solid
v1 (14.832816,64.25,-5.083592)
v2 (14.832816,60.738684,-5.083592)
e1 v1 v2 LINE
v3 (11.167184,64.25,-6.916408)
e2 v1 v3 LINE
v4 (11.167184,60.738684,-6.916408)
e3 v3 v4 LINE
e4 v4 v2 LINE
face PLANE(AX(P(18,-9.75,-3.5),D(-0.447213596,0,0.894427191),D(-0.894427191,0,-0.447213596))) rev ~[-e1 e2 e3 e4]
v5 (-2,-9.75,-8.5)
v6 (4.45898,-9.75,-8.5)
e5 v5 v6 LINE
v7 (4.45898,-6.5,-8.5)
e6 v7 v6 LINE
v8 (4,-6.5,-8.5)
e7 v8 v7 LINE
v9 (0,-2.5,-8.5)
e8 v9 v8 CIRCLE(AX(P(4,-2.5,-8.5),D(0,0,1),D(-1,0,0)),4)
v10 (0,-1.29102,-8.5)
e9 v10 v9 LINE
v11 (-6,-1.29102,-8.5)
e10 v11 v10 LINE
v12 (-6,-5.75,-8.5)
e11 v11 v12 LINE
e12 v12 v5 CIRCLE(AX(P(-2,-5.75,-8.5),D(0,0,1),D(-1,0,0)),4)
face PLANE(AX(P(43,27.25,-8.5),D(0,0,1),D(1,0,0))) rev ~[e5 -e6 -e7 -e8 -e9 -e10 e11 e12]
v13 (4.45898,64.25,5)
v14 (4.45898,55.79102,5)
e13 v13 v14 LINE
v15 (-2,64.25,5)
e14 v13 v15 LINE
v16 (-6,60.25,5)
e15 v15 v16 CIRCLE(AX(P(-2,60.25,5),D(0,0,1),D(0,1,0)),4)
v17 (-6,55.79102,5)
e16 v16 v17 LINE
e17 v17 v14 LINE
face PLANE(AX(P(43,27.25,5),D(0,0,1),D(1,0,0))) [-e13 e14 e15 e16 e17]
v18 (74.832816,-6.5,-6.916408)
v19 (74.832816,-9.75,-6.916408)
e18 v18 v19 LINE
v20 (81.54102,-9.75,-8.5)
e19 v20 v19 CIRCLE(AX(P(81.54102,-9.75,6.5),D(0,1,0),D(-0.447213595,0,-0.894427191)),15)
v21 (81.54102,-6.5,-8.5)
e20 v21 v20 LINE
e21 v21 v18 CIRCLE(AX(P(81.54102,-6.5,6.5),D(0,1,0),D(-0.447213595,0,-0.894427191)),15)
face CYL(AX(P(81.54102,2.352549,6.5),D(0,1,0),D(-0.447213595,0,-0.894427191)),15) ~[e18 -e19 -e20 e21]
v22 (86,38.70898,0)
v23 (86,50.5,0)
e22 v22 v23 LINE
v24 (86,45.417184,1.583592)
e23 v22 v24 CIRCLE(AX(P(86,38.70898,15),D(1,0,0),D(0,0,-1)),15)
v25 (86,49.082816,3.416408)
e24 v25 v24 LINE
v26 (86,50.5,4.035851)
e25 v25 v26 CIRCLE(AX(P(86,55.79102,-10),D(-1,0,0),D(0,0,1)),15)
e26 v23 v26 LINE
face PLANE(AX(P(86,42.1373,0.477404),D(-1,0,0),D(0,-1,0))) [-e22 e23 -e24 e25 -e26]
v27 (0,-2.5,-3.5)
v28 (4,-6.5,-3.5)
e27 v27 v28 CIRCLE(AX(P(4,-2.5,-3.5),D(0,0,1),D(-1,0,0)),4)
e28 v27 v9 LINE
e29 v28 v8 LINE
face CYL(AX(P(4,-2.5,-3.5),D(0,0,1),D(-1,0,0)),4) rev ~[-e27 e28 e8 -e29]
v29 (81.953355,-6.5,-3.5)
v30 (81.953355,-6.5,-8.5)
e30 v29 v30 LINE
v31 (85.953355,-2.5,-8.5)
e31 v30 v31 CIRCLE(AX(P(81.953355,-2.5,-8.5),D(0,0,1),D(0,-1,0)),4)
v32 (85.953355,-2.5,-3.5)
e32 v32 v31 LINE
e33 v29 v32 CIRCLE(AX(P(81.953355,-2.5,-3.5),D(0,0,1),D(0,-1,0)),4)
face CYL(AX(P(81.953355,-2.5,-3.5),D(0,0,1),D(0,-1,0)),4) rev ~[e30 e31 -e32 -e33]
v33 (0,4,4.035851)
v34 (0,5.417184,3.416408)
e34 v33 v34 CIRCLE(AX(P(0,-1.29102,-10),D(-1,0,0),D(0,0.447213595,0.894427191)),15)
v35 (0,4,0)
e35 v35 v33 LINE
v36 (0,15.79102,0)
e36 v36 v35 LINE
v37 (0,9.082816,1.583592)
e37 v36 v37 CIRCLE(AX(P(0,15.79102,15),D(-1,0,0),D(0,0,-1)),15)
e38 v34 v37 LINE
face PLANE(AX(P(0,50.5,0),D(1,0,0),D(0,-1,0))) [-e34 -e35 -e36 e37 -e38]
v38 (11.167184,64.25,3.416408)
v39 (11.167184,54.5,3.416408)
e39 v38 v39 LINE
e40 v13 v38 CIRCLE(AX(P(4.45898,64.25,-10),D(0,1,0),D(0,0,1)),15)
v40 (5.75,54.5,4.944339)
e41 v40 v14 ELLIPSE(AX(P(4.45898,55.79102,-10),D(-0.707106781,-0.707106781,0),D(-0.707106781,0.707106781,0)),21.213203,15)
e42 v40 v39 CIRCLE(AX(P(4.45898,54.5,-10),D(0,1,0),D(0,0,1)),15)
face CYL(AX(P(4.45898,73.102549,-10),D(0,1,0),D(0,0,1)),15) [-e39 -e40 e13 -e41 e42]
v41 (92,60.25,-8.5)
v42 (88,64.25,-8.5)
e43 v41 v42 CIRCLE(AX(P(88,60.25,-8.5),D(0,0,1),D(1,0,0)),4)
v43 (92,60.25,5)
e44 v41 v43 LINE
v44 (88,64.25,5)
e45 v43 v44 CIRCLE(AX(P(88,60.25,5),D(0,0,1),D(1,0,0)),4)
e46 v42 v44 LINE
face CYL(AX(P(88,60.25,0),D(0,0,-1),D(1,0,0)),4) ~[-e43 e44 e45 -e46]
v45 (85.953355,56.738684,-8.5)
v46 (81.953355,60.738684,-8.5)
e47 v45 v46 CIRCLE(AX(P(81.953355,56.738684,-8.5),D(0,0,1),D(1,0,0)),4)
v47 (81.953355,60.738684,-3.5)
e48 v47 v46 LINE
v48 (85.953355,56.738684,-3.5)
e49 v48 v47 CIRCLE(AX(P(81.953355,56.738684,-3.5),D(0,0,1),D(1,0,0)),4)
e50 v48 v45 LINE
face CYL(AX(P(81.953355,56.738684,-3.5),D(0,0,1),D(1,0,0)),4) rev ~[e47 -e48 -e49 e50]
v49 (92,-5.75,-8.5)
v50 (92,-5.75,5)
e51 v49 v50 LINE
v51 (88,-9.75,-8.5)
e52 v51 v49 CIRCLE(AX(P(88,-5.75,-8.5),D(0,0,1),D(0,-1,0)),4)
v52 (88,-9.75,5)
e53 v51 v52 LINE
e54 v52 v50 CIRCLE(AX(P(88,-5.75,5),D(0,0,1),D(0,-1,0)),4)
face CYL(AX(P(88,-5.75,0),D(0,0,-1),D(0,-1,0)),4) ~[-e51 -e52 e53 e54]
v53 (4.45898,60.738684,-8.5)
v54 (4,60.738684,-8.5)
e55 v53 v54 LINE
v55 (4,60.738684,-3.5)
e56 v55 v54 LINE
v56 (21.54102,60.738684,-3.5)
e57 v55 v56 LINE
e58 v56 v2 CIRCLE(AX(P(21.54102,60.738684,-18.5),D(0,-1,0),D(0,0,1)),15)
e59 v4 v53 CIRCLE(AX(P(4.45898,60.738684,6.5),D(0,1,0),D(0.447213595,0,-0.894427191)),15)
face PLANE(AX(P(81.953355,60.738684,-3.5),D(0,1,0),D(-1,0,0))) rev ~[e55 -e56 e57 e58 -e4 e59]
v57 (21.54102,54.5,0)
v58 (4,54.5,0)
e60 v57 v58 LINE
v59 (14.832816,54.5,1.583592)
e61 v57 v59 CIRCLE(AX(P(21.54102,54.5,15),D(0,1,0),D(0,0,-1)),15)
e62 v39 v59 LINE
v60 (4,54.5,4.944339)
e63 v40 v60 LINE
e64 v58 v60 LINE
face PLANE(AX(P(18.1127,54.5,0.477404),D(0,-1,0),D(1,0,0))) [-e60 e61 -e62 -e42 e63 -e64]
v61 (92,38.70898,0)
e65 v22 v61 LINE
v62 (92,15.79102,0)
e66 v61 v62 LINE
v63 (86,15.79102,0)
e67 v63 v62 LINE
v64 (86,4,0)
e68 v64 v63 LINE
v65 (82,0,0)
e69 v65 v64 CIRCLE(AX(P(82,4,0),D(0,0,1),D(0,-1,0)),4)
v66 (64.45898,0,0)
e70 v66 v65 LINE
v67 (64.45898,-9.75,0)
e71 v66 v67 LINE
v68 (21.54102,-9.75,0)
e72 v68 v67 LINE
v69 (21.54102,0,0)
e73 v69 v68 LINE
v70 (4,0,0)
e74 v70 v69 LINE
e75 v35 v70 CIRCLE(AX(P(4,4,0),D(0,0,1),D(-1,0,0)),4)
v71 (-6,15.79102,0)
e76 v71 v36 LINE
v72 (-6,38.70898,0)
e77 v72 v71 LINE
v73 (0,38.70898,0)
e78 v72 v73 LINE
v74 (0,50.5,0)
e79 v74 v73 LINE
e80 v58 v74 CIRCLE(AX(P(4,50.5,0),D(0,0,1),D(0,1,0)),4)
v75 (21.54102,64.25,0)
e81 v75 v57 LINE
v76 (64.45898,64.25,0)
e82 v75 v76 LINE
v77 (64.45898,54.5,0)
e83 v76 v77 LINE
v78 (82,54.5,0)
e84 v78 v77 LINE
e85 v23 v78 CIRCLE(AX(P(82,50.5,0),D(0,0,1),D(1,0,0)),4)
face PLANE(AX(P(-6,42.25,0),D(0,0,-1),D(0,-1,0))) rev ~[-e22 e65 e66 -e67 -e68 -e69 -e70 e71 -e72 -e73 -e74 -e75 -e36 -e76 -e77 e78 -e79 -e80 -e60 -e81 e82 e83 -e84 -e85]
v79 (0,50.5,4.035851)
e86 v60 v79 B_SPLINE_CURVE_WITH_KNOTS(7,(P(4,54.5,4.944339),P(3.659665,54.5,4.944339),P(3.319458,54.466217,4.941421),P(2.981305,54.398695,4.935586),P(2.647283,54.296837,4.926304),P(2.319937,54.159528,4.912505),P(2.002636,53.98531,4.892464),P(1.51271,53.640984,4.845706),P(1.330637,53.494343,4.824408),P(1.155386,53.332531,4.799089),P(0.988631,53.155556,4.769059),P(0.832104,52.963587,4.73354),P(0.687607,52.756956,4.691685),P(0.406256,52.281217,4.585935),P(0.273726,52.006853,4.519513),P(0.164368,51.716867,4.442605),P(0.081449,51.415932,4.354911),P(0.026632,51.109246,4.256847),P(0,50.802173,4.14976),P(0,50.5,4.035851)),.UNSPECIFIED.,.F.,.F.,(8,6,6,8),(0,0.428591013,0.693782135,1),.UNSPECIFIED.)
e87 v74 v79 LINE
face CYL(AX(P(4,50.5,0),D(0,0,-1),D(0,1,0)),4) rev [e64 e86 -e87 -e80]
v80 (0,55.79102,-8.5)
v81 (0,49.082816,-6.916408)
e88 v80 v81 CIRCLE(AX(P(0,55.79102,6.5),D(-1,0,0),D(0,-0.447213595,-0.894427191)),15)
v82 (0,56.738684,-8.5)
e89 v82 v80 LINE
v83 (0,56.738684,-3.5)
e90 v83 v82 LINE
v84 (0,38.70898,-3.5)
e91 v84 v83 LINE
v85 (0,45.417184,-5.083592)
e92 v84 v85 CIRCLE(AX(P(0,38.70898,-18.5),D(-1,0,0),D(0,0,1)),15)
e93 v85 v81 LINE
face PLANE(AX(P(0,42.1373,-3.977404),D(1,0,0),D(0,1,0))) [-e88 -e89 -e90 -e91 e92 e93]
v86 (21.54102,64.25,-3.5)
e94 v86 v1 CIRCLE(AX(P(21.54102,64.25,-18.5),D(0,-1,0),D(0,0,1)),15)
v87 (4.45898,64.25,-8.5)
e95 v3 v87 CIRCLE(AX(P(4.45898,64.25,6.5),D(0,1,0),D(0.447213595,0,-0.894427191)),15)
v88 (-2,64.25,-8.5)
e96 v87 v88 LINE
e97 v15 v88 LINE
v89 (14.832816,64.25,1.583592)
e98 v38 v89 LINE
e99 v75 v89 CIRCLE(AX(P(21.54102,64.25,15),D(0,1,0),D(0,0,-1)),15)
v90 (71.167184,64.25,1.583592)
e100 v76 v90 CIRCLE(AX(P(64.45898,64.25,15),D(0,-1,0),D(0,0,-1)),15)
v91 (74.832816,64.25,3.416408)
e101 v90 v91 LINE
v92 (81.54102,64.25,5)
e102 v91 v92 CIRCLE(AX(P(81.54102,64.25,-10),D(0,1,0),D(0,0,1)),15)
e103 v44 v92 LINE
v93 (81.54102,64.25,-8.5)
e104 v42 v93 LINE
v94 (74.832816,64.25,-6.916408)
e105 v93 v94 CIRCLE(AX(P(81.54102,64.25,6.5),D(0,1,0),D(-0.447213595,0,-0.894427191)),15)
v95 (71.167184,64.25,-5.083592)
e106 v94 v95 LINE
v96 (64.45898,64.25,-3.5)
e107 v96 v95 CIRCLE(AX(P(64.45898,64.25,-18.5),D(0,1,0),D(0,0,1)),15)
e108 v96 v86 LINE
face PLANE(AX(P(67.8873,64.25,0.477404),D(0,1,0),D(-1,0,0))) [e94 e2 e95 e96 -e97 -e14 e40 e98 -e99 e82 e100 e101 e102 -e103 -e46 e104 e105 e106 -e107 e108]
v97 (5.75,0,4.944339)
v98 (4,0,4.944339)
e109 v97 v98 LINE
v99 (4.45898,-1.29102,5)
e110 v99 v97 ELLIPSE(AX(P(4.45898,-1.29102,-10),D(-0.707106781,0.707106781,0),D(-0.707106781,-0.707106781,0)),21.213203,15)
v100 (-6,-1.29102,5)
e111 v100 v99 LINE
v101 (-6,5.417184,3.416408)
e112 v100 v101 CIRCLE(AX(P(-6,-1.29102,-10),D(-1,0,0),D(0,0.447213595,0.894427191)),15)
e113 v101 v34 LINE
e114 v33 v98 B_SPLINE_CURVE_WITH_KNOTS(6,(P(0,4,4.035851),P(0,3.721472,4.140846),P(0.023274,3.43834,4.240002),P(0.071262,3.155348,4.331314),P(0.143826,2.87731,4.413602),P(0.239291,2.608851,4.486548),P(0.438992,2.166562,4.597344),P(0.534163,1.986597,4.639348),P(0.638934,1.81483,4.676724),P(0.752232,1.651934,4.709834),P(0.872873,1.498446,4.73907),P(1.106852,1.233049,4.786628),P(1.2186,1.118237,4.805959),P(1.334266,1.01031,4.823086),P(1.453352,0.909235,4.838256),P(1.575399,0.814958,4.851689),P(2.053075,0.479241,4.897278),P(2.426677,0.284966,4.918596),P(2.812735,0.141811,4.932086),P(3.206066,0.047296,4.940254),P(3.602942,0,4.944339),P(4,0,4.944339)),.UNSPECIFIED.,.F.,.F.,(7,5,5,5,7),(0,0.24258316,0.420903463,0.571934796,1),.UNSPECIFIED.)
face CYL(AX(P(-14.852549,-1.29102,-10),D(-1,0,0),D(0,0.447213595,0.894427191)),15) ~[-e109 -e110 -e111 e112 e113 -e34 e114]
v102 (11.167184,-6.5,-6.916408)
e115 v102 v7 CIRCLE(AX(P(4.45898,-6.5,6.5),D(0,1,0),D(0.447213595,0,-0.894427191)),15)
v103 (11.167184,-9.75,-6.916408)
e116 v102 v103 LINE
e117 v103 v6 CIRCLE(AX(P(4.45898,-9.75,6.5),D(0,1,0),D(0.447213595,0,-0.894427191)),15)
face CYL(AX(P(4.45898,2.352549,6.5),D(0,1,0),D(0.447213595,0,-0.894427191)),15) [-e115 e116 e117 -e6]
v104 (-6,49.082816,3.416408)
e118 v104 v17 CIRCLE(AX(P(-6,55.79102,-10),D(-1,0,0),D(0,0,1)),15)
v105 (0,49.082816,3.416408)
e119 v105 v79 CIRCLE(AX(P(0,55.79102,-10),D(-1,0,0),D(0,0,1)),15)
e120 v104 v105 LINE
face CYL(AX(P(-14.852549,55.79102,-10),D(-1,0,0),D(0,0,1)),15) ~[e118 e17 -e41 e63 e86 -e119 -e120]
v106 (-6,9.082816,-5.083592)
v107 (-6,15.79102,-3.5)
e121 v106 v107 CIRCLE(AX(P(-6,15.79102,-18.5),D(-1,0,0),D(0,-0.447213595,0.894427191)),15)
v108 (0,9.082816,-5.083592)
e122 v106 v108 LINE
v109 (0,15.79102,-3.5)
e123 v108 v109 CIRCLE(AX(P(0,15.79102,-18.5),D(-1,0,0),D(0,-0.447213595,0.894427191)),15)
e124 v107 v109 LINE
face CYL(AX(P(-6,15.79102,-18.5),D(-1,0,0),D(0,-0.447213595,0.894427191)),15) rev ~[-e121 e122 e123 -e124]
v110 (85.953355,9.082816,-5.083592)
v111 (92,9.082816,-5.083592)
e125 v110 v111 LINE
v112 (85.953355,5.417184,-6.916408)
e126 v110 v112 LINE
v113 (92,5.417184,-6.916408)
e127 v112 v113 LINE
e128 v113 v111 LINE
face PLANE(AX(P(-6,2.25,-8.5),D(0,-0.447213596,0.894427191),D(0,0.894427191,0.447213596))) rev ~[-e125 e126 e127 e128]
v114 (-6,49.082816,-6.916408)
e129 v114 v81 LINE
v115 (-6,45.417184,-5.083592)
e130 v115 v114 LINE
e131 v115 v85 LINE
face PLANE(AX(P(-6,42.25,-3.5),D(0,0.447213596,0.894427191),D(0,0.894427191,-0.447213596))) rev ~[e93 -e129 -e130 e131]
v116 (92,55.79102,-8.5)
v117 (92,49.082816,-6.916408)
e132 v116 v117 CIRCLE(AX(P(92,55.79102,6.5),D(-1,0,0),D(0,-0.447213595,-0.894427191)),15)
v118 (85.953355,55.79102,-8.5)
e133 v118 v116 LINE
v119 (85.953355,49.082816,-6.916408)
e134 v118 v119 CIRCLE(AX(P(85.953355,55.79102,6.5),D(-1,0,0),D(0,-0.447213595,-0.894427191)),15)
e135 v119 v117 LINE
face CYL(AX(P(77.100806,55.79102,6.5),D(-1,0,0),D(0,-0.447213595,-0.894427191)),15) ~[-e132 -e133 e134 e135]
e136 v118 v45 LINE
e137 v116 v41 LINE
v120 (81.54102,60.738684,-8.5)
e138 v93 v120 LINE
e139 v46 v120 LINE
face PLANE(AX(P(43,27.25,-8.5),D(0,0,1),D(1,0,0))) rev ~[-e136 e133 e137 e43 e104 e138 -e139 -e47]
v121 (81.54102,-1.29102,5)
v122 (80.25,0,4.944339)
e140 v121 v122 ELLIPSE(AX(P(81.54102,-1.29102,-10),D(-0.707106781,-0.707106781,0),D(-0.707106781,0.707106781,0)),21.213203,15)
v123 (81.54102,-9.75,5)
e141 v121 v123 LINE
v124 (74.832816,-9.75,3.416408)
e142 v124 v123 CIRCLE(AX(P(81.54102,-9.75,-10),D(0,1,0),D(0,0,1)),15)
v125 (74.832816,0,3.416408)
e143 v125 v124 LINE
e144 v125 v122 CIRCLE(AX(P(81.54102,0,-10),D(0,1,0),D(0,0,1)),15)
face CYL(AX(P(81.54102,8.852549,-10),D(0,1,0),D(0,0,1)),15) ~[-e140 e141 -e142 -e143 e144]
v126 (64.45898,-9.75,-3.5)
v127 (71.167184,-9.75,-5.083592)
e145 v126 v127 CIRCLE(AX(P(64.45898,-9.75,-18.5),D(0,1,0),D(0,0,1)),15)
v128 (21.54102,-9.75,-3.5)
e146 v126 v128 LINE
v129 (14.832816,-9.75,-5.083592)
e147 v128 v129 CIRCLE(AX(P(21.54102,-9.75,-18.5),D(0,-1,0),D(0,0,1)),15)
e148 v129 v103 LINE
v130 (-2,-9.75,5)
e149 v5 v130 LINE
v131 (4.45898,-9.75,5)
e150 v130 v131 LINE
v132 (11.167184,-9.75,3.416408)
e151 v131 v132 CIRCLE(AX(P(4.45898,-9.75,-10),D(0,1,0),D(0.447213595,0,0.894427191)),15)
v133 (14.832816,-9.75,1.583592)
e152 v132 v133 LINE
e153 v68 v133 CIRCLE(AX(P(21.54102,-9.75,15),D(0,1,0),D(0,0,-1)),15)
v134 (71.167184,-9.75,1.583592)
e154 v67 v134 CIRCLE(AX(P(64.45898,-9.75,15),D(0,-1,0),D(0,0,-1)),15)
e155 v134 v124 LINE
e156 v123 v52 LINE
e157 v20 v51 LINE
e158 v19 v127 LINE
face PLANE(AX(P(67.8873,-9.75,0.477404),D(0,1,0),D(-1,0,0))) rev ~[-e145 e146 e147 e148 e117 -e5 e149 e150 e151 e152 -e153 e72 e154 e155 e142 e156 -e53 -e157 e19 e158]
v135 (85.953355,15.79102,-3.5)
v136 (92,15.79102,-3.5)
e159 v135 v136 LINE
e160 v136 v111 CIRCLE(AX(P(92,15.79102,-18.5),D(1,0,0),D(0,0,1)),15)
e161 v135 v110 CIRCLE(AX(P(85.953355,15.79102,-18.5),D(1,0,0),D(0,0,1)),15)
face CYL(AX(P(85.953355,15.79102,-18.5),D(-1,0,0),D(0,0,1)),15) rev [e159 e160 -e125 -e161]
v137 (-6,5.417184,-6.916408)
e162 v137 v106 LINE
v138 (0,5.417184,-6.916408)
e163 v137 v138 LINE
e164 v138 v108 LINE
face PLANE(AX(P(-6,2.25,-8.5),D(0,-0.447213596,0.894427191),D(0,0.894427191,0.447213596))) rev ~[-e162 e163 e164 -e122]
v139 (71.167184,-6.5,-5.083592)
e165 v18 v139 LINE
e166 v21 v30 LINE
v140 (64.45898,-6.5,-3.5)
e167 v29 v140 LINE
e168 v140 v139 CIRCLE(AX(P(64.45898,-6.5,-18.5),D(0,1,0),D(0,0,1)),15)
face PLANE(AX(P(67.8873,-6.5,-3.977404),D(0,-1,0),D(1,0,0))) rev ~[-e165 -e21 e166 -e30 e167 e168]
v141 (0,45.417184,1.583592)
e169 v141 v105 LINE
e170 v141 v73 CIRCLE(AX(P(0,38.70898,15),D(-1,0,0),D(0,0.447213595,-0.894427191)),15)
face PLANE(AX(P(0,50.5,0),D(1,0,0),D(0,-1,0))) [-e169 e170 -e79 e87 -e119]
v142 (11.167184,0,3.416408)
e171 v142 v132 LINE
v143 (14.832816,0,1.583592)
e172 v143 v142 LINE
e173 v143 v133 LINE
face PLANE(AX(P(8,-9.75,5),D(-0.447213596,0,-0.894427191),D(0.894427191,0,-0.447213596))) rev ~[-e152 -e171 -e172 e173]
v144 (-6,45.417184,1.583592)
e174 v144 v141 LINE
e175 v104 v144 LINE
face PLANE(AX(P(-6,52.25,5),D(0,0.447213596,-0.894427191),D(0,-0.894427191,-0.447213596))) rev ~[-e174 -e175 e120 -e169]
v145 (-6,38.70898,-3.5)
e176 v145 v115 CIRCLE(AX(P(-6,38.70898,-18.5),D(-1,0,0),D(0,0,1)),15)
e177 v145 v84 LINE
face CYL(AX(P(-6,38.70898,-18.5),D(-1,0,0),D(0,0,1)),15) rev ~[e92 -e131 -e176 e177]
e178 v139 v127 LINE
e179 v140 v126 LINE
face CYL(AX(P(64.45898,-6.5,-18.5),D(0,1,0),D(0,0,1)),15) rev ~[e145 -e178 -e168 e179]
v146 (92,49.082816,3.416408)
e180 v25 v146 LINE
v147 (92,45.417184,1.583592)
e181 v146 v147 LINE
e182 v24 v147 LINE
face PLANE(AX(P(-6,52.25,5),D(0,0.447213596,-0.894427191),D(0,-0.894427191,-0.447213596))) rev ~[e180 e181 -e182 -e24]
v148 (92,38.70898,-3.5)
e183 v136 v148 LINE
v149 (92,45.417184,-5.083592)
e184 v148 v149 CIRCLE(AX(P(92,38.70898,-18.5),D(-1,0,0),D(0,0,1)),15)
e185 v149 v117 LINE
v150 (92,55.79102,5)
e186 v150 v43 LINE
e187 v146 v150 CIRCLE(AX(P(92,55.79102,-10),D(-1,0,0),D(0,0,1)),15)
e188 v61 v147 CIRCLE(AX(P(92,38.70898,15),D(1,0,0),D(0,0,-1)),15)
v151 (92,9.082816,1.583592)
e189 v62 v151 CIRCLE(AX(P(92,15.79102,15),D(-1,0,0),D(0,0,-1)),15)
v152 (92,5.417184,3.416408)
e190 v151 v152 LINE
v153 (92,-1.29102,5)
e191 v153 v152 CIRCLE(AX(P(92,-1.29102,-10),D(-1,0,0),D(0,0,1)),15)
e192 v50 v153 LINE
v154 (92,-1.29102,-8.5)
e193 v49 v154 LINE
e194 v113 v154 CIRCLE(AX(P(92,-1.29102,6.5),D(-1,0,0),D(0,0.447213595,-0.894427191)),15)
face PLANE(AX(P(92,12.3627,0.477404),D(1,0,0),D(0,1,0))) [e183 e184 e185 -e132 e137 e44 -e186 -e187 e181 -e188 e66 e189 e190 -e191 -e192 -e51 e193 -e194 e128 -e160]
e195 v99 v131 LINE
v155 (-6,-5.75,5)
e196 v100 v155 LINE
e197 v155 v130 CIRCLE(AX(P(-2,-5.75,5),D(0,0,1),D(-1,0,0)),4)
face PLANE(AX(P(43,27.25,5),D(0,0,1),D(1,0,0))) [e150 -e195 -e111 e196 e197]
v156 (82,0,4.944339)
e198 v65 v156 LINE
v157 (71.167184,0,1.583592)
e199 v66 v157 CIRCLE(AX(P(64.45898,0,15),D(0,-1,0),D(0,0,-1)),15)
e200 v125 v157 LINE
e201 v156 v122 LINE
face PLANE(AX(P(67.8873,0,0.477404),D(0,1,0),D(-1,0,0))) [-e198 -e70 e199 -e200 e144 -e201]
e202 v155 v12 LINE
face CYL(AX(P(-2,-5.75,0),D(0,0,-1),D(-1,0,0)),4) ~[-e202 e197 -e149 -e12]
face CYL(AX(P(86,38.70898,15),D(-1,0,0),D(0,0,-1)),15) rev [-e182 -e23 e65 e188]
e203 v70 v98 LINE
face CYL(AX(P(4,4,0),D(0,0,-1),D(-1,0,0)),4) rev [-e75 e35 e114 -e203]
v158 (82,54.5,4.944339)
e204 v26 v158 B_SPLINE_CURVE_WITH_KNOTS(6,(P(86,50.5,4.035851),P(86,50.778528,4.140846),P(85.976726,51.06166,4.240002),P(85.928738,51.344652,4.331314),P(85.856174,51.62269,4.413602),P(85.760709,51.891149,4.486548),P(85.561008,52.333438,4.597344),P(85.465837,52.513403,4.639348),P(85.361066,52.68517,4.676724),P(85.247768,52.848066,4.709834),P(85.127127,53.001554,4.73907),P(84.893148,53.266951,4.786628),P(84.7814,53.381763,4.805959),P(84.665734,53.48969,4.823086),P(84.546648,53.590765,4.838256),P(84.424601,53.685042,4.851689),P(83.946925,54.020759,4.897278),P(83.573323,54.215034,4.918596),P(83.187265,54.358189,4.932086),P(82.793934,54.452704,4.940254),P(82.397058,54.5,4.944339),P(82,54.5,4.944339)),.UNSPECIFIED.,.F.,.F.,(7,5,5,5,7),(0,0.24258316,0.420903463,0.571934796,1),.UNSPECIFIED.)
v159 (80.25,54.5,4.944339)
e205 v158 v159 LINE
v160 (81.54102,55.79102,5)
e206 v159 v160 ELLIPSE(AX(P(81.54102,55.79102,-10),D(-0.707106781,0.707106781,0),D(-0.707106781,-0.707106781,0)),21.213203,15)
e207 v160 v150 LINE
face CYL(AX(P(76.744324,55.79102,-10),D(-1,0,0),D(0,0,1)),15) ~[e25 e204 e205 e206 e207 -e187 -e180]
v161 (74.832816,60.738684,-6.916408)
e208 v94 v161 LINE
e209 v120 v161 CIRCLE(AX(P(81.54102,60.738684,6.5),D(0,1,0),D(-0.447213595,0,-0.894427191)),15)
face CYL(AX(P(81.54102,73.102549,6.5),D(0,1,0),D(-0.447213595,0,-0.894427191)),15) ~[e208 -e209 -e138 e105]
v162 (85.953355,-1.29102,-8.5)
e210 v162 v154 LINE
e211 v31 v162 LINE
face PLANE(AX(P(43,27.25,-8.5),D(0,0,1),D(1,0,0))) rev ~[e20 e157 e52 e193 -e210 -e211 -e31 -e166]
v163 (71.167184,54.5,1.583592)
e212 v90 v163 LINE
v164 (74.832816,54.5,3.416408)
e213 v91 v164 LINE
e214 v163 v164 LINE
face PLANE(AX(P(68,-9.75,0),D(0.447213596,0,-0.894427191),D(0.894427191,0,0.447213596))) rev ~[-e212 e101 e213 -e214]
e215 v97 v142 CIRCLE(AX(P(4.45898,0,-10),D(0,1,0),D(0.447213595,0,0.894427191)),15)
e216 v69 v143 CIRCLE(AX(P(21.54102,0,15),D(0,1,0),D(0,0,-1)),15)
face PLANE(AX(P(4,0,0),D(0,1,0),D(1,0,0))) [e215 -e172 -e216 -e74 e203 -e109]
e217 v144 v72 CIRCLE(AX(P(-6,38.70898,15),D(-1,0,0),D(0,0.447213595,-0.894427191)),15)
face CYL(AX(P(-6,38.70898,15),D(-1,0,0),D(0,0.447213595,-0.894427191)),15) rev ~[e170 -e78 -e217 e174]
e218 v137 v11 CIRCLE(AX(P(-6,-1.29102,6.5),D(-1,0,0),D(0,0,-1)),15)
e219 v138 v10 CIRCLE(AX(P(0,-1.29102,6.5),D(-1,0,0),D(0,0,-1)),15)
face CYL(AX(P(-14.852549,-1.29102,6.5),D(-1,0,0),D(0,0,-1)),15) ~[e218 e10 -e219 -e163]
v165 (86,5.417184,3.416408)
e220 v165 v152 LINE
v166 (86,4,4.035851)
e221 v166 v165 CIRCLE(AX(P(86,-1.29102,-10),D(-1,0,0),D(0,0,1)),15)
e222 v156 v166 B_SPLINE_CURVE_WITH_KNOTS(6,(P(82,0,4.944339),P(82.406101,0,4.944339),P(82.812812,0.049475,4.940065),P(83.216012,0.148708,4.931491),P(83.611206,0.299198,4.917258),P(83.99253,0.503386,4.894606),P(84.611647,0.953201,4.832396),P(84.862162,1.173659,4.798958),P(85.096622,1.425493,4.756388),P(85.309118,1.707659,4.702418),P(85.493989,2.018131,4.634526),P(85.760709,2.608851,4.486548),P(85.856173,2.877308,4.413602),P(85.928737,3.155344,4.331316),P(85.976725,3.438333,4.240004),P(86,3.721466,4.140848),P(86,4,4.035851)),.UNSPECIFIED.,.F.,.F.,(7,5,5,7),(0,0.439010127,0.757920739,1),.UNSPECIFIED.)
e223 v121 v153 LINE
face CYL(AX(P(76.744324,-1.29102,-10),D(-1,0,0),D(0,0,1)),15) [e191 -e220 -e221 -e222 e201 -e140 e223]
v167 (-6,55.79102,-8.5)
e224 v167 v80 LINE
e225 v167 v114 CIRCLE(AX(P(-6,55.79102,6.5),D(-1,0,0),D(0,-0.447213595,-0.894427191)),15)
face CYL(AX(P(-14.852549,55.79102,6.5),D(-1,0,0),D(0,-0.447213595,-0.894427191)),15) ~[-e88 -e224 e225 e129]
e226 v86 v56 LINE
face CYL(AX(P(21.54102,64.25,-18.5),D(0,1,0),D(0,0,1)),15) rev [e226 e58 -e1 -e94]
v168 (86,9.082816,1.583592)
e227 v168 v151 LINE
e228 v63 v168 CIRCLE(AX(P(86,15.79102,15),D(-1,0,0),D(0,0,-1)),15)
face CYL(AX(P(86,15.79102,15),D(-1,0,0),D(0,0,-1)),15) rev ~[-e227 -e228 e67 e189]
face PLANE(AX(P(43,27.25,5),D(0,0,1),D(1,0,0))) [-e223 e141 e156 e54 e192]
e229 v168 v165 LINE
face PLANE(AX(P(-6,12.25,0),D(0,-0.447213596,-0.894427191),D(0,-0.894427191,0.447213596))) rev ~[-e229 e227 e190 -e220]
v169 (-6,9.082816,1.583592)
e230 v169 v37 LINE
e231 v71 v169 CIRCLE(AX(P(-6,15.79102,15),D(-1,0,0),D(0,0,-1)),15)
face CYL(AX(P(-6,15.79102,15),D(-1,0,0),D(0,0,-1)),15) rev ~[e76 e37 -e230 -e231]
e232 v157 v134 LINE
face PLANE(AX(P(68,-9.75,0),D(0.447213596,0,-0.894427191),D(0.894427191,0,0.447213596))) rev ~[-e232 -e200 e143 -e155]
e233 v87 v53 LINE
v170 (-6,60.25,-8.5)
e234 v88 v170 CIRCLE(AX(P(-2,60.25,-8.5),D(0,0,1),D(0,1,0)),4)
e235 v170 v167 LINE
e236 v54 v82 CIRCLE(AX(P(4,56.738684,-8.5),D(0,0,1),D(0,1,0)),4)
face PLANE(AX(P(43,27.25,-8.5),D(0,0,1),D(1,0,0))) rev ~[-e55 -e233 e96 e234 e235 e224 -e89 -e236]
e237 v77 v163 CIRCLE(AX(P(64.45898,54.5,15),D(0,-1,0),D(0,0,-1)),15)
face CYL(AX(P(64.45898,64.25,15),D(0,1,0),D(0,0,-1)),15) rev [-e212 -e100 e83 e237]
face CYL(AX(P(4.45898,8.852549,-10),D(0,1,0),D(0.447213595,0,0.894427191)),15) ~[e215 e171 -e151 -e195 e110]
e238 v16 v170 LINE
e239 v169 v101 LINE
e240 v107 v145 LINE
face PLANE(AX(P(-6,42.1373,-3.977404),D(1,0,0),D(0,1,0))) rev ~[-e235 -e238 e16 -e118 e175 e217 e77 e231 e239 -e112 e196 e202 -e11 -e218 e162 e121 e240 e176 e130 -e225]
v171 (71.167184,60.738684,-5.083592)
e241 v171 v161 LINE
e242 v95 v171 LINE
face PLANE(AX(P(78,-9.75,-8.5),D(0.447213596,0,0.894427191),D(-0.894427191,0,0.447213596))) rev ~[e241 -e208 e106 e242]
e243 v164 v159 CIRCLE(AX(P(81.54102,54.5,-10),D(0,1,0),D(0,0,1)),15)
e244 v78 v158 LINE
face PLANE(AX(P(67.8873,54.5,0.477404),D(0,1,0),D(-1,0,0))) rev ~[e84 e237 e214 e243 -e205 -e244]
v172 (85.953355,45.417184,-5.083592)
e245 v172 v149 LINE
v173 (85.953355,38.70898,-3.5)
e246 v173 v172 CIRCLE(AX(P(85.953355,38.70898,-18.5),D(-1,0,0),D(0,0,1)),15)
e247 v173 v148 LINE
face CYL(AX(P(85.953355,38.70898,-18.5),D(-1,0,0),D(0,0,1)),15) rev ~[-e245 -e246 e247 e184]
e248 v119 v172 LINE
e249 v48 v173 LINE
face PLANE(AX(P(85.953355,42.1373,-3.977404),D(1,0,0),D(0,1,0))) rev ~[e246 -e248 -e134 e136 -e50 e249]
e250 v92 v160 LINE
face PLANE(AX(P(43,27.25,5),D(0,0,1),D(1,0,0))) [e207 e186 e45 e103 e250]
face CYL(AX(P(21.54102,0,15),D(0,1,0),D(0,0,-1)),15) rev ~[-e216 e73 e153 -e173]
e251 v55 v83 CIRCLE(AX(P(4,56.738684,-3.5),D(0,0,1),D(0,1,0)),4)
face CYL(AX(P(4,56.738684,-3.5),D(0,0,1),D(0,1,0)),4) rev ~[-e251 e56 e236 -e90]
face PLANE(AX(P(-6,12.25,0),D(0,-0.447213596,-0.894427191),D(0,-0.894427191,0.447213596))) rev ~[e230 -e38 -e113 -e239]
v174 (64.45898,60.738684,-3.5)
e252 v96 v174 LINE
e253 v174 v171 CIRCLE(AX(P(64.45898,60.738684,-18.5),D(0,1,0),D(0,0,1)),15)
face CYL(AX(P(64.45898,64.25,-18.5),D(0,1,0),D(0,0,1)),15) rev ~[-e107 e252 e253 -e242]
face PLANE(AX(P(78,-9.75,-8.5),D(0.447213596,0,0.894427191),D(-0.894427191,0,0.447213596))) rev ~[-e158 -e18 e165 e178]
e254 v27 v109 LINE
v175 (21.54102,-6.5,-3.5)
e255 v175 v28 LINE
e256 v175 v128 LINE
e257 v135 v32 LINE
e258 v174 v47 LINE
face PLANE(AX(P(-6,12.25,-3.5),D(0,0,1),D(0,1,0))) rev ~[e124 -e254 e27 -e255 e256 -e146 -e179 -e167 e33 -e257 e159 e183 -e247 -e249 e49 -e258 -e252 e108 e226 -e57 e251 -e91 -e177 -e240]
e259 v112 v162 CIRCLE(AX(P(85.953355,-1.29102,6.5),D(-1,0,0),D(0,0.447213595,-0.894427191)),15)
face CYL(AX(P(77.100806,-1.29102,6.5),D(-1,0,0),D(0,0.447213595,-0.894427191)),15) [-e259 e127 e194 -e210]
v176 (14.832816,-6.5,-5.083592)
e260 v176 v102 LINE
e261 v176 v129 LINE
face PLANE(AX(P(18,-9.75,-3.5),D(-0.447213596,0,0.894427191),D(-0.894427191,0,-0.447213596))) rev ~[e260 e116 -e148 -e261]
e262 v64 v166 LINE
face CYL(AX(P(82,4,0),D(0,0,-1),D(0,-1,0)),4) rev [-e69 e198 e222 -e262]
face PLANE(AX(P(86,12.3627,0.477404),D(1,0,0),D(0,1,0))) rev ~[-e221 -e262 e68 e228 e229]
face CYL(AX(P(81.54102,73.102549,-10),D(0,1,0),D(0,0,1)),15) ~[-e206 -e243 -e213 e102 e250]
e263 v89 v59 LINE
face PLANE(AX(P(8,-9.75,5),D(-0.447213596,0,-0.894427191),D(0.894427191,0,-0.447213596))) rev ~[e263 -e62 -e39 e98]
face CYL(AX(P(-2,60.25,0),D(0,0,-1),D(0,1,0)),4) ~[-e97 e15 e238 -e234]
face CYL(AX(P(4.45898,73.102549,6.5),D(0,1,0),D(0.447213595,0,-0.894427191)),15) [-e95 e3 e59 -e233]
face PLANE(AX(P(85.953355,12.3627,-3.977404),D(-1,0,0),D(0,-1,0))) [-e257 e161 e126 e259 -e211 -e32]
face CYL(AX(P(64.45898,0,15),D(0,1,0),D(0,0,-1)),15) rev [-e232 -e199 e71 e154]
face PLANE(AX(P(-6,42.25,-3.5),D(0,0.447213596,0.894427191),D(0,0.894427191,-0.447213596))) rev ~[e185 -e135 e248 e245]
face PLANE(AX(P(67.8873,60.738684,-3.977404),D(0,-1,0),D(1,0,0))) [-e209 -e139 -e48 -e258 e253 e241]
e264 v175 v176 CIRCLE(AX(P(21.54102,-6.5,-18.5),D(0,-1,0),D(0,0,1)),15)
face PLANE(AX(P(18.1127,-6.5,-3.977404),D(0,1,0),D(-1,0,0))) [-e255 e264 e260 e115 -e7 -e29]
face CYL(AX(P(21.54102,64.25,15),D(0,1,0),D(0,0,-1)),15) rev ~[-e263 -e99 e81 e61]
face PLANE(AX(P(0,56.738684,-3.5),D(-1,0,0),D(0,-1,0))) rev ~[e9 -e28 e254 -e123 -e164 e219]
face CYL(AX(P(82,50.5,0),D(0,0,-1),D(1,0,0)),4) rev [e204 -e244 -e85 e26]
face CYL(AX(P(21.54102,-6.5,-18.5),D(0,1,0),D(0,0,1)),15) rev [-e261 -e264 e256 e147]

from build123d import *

# Parameters (mm, degrees)
F2_DEPTH      = 8.5
F2_DEPTH_BACK = 5
F3_DEPTH      = 5
F5_START      = -3.5
F5_DEPTH      = 5
F7_DEPTH      = 98.001
F9_DEPTH      = 74.001
F10_T1_DEPTH  = 6.0466451645
F10_T3_DEPTH  = 6
F10_T5_DEPTH  = 3.25
F10_T7_DEPTH  = 3.5113155246
F10_T9_DEPTH  = 6
F10_T11_DEPTH = 9.75
F10_T13_DEPTH = 9.75
F10_T15_DEPTH = 23.7050983125
F10_T17_DEPTH = 23.751743477
F10_T19_DEPTH = 21.2164138371
F10_T21_DEPTH = 20.9550983125
F10_T23_DEPTH = 24.10822467
F10_T25_DEPTH = 24.10822467
F10_T27_DEPTH = 27.4550983125
F10_T29_DEPTH = 27.4550983125


# Not quite as in the source:
# - a fillet or chamfer that OpenCascade refuses, or shapes differently, is made with other operations: its cross-section is extruded or revolved along the edge and cut away or added


with BuildPart() as f2:
    # F1 (on Top) → F2 (new body, two sides)
    with BuildSketch(Plane.XY) as f2_sk:
        with BuildLine():
            ThreePointArc((-6, -5.75), (-4.8284271247, -8.5784271247), (-2, -9.75))
            Line((-2, -9.75), (88, -9.75))
            ThreePointArc((88, -9.75), (90.8284271247, -8.5784271247), (92, -5.75))
            Line((92, -5.75), (92, 60.25))
            ThreePointArc((92, 60.25), (90.8284271247, 63.0784271247), (88, 64.25))
            Line((88, 64.25), (-2, 64.25))
            ThreePointArc((-2, 64.25), (-4.8284271247, 63.0784271247), (-6, 60.25))
            Line((-6, 60.25), (-6, -5.75))
        make_face()
    extrude(amount=-F2_DEPTH)
    extrude(f2_sk.sketch, amount=F2_DEPTH_BACK)

    # F0 (on Top) → F3 (cut)
    with BuildSketch(Plane.XY):
        with BuildLine():
            ThreePointArc((0, 4), (1.1715728753, 1.1715728753), (4, 0))
            Line((4, 0), (82, 0))
            ThreePointArc((82, 0), (84.8284271247, 1.1715728753), (86, 4))
            Line((86, 4), (86, 50.5))
            ThreePointArc((86, 50.5), (84.8284271247, 53.3284271247), (82, 54.5))
            Line((82, 54.5), (4, 54.5))
            ThreePointArc((4, 54.5), (1.1715728753, 53.3284271247), (0, 50.5))
            Line((0, 50.5), (0, 4))
        make_face()
    extrude(amount=F3_DEPTH, mode=Mode.SUBTRACT)

    # F4 (on Top) → F5 (cut)
    with BuildSketch(Plane.XY.offset(F5_START)):
        with BuildLine():
            ThreePointArc((0, -2.5), (1.1715728753, -5.3284271247), (4, -6.5))
            Line((4, -6.5), (81.9533548355, -6.5))
            ThreePointArc((81.9533548355, -6.5), (84.7817819603, -5.3284271247), (85.9533548355, -2.5))
            Line((85.9533548355, -2.5), (85.9533548355, 56.7386844754))
            ThreePointArc((85.9533548355, 56.7386844754), (84.7817819603, 59.5671116002), (81.9533548355, 60.7386844754))
            Line((81.9533548355, 60.7386844754), (4, 60.7386844754))
            ThreePointArc((4, 60.7386844754), (1.1715728753, 59.5671116002), (0, 56.7386844754))
            Line((0, 56.7386844754), (0, -2.5))
        make_face()
    extrude(amount=-F5_DEPTH, mode=Mode.SUBTRACT)

    # F6 (on face) → F7 (cut, through all)
    with BuildSketch(Plane(origin=(-6, 0, 0), x_dir=(0, -1, 0), z_dir=(-1, 0, 0))):
        Polygon((-27.25, -8.5), (-2.25, -8.5), (-12.25, -3.5), (-27.25, -3.5), (-42.25, -3.5), (-52.25, -8.5), align=None)
        Polygon((-12.25, 0), (-2.25, 5), (-27.25, 5), (-52.25, 5), (-42.25, 0), (-27.25, 0), align=None)
    extrude(amount=-F7_DEPTH, mode=Mode.SUBTRACT)

    # F8 (on face) → F9 (cut, through all)
    with BuildSketch(Plane.XZ.offset(9.75)):
        Polygon((18, -3.5), (8, -8.5), (78, -8.5), (68, -3.5), (43, -3.5), align=None)
        Polygon((78, 5), (8, 5), (18, 0), (43, 0), (68, 0), align=None)
    extrude(amount=-F9_DEPTH, mode=Mode.SUBTRACT)

    # F10: fillet of radius 15 on 32 edges, made by hand

    # F10_s2 → F10_t1 (join)
    with BuildSketch(Plane.YZ.offset(85.9533548355)):
        with BuildLine():
            ThreePointArc((38.7089803375, -3.5), (42.1552741457, -3.901265158), (45.41718427, -5.083592135))
            Line((45.41718427, -5.083592135), (42.25, -3.5))
            Line((42.25, -3.5), (38.7089803375, -3.5))
        make_face()
        with BuildLine():
            ThreePointArc((15.7910196625, -3.5), (12.3447258543, -3.901265158), (9.08281573, -5.083592135))
            Line((9.08281573, -5.083592135), (12.25, -3.5))
            Line((12.25, -3.5), (15.7910196625, -3.5))
        make_face()
    extrude(amount=F10_T1_DEPTH)

    # F10_s4 → F10_t3 (join)
    with BuildSketch(Plane.YZ.offset(-6)):
        with BuildLine():
            ThreePointArc((38.7089803375, -3.5), (42.1552741457, -3.901265158), (45.41718427, -5.083592135))
            Line((45.41718427, -5.083592135), (42.25, -3.5))
            Line((42.25, -3.5), (38.7089803375, -3.5))
        make_face()
        with BuildLine():
            ThreePointArc((9.08281573, -5.083592135), (12.3447258543, -3.901265158), (15.7910196625, -3.5))
            Line((15.7910196625, -3.5), (12.25, -3.5))
            Line((12.25, -3.5), (9.08281573, -5.083592135))
        make_face()
        with BuildLine():
            ThreePointArc((15.7910196625, 0), (12.3447258543, 0.401265158), (9.08281573, 1.583592135))
            Line((9.08281573, 1.583592135), (12.25, 0))
            Line((12.25, 0), (15.7910196625, 0))
        make_face()
        with BuildLine():
            ThreePointArc((45.41718427, 1.583592135), (42.1552741457, 0.401265158), (38.7089803375, 0))
            Line((38.7089803375, 0), (42.25, 0))
            Line((42.25, 0), (45.41718427, 1.583592135))
        make_face()
    extrude(amount=F10_T3_DEPTH)

    # F10_s6 → F10_t5 (join)
    with BuildSketch(Plane.XZ.offset(6.5)):
        with BuildLine():
            ThreePointArc((64.4589803375, -3.5), (67.9052741457, -3.901265158), (71.16718427, -5.083592135))
            Line((71.16718427, -5.083592135), (68, -3.5))
            Line((68, -3.5), (64.4589803375, -3.5))
        make_face()
        with BuildLine():
            ThreePointArc((21.5410196625, -3.5), (18.0947258543, -3.901265158), (14.83281573, -5.083592135))
            Line((14.83281573, -5.083592135), (18, -3.5))
            Line((18, -3.5), (21.5410196625, -3.5))
        make_face()
    extrude(amount=F10_T5_DEPTH)

    # F10_s8 → F10_t7 (join)
    with BuildSketch(Plane.XZ.offset(-64.25)):
        with BuildLine():
            ThreePointArc((64.4589803375, -3.5), (67.9052741457, -3.901265158), (71.16718427, -5.083592135))
            Line((71.16718427, -5.083592135), (68, -3.5))
            Line((68, -3.5), (64.4589803375, -3.5))
        make_face()
        with BuildLine():
            ThreePointArc((21.5410196625, -3.5), (18.0947258543, -3.901265158), (14.83281573, -5.083592135))
            Line((14.83281573, -5.083592135), (18, -3.5))
            Line((18, -3.5), (21.5410196625, -3.5))
        make_face()
    extrude(amount=F10_T7_DEPTH)

    # F10_s10 → F10_t9 (join)
    with BuildSketch(Plane.YZ.offset(86)):
        with BuildLine():
            ThreePointArc((15.7910196625, 0), (12.3447258543, 0.401265158), (9.08281573, 1.583592135))
            Line((9.08281573, 1.583592135), (12.25, 0))
            Line((12.25, 0), (15.7910196625, 0))
        make_face()
        with BuildLine():
            ThreePointArc((38.7089803375, 0), (42.1552741457, 0.401265158), (45.41718427, 1.583592135))
            Line((45.41718427, 1.583592135), (42.25, 0))
            Line((42.25, 0), (38.7089803375, 0))
        make_face()
    extrude(amount=F10_T9_DEPTH)

    # F10_s12 → F10_t11 (join)
    with BuildSketch(Plane.XZ.offset(-64.25)):
        with BuildLine():
            ThreePointArc((64.4589803375, 0), (67.9052741457, 0.401265158), (71.16718427, 1.583592135))
            Line((71.16718427, 1.583592135), (68, 0))
            Line((68, 0), (64.4589803375, 0))
        make_face()
        with BuildLine():
            ThreePointArc((21.5410196625, 0), (18.0947258543, 0.401265158), (14.83281573, 1.583592135))
            Line((14.83281573, 1.583592135), (18, 0))
            Line((18, 0), (21.5410196625, 0))
        make_face()
    extrude(amount=F10_T11_DEPTH)

    # F10_s14 → F10_t13 (join)
    with BuildSketch(Plane.XZ):
        with BuildLine():
            ThreePointArc((64.4589803375, 0), (67.9052741457, 0.401265158), (71.16718427, 1.583592135))
            Line((71.16718427, 1.583592135), (68, 0))
            Line((68, 0), (64.4589803375, 0))
        make_face()
        with BuildLine():
            ThreePointArc((21.5410196625, 0), (18.0947258543, 0.401265158), (14.83281573, 1.583592135))
            Line((14.83281573, 1.583592135), (18, 0))
            Line((18, 0), (21.5410196625, 0))
        make_face()
    extrude(amount=F10_T13_DEPTH)

    # F10_s16 → F10_t15 (cut)
    with BuildSketch(Plane.YZ.offset(-14.8525491562)):
        with BuildLine():
            ThreePointArc((-1.2910196625, -8.5), (2.1552741457, -8.098734842), (5.41718427, -6.916407865))
            Line((5.41718427, -6.916407865), (2.25, -8.5))
            Line((2.25, -8.5), (-1.2910196625, -8.5))
        make_face()
        with BuildLine():
            ThreePointArc((49.08281573, -6.916407865), (52.3447258543, -8.098734842), (55.7910196625, -8.5))
            Line((55.7910196625, -8.5), (52.25, -8.5))
            Line((52.25, -8.5), (49.08281573, -6.916407865))
        make_face()
    extrude(amount=F10_T15_DEPTH, mode=Mode.SUBTRACT)

    # F10_s18 → F10_t17 (cut)
    with BuildSketch(Plane.YZ.offset(77.1008056793)):
        with BuildLine():
            ThreePointArc((5.41718427, -6.916407865), (2.1552741457, -8.098734842), (-1.2910196625, -8.5))
            Line((-1.2910196625, -8.5), (2.25, -8.5))
            Line((2.25, -8.5), (5.41718427, -6.916407865))
        make_face()
        with BuildLine():
            ThreePointArc((49.08281573, -6.916407865), (52.3447258543, -8.098734842), (55.7910196625, -8.5))
            Line((55.7910196625, -8.5), (52.25, -8.5))
            Line((52.25, -8.5), (49.08281573, -6.916407865))
        make_face()
    extrude(amount=F10_T17_DEPTH, mode=Mode.SUBTRACT)

    # F10_s20 → F10_t19 (cut)
    with BuildSketch(Plane.XZ.offset(-73.1025491562)):
        with BuildLine():
            ThreePointArc((74.83281573, -6.916407865), (78.0947258543, -8.098734842), (81.5410196625, -8.5))
            Line((81.5410196625, -8.5), (78, -8.5))
            Line((78, -8.5), (74.83281573, -6.916407865))
        make_face()
        with BuildLine():
            ThreePointArc((11.16718427, -6.916407865), (7.9052741457, -8.098734842), (4.4589803375, -8.5))
            Line((4.4589803375, -8.5), (8, -8.5))
            Line((8, -8.5), (11.16718427, -6.916407865))
        make_face()
    extrude(amount=F10_T19_DEPTH, mode=Mode.SUBTRACT)

    # F10_s22 → F10_t21 (cut)
    with BuildSketch(Plane.XZ.offset(-2.3525491562)):
        with BuildLine():
            ThreePointArc((74.83281573, -6.916407865), (78.0947258543, -8.098734842), (81.5410196625, -8.5))
            Line((81.5410196625, -8.5), (78, -8.5))
            Line((78, -8.5), (74.83281573, -6.916407865))
        make_face()
        with BuildLine():
            ThreePointArc((11.16718427, -6.916407865), (7.9052741457, -8.098734842), (4.4589803375, -8.5))
            Line((4.4589803375, -8.5), (8, -8.5))
            Line((8, -8.5), (11.16718427, -6.916407865))
        make_face()
    extrude(amount=F10_T21_DEPTH, mode=Mode.SUBTRACT)

    # F10_s24 → F10_t23 (cut)
    with BuildSketch(Plane.YZ.offset(-14.8525491562)):
        with BuildLine():
            ThreePointArc((5.41718427, 3.416407865), (2.1552741457, 4.598734842), (-1.2910196625, 5))
            Line((-1.2910196625, 5), (2.25, 5))
            Line((2.25, 5), (5.41718427, 3.416407865))
        make_face()
        with BuildLine():
            ThreePointArc((55.7910196625, 5), (52.3447258543, 4.598734842), (49.08281573, 3.416407865))
            Line((49.08281573, 3.416407865), (52.25, 5))
            Line((52.25, 5), (55.7910196625, 5))
        make_face()
    extrude(amount=F10_T23_DEPTH, mode=Mode.SUBTRACT)

    # F10_s26 → F10_t25 (cut)
    with BuildSketch(Plane.YZ.offset(76.7443244862)):
        with BuildLine():
            ThreePointArc((-1.2910196625, 5), (2.1552741457, 4.598734842), (5.41718427, 3.416407865))
            Line((5.41718427, 3.416407865), (2.25, 5))
            Line((2.25, 5), (-1.2910196625, 5))
        make_face()
        with BuildLine():
            ThreePointArc((55.7910196625, 5), (52.3447258543, 4.598734842), (49.08281573, 3.416407865))
            Line((49.08281573, 3.416407865), (52.25, 5))
            Line((52.25, 5), (55.7910196625, 5))
        make_face()
    extrude(amount=F10_T25_DEPTH, mode=Mode.SUBTRACT)

    # F10_s28 → F10_t27 (cut)
    with BuildSketch(Plane.XZ.offset(-73.1025491562)):
        with BuildLine():
            ThreePointArc((81.5410196625, 5), (78.0947258543, 4.598734842), (74.83281573, 3.416407865))
            Line((74.83281573, 3.416407865), (78, 5))
            Line((78, 5), (81.5410196625, 5))
        make_face()
        with BuildLine():
            ThreePointArc((4.4589803375, 5), (7.9052741457, 4.598734842), (11.16718427, 3.416407865))
            Line((11.16718427, 3.416407865), (8, 5))
            Line((8, 5), (4.4589803375, 5))
        make_face()
    extrude(amount=F10_T27_DEPTH, mode=Mode.SUBTRACT)

    # F10_s30 → F10_t29 (cut)
    with BuildSketch(Plane.XZ.offset(-8.8525491562)):
        with BuildLine():
            ThreePointArc((81.5410196625, 5), (78.0947258543, 4.598734842), (74.83281573, 3.416407865))
            Line((74.83281573, 3.416407865), (78, 5))
            Line((78, 5), (81.5410196625, 5))
        make_face()
        with BuildLine():
            ThreePointArc((11.16718427, 3.416407865), (7.9052741457, 4.598734842), (4.4589803375, 5))
            Line((4.4589803375, 5), (8, 5))
            Line((8, 5), (11.16718427, 3.416407865))
        make_face()
    extrude(amount=F10_T29_DEPTH, mode=Mode.SUBTRACT)


solid = f2.part
